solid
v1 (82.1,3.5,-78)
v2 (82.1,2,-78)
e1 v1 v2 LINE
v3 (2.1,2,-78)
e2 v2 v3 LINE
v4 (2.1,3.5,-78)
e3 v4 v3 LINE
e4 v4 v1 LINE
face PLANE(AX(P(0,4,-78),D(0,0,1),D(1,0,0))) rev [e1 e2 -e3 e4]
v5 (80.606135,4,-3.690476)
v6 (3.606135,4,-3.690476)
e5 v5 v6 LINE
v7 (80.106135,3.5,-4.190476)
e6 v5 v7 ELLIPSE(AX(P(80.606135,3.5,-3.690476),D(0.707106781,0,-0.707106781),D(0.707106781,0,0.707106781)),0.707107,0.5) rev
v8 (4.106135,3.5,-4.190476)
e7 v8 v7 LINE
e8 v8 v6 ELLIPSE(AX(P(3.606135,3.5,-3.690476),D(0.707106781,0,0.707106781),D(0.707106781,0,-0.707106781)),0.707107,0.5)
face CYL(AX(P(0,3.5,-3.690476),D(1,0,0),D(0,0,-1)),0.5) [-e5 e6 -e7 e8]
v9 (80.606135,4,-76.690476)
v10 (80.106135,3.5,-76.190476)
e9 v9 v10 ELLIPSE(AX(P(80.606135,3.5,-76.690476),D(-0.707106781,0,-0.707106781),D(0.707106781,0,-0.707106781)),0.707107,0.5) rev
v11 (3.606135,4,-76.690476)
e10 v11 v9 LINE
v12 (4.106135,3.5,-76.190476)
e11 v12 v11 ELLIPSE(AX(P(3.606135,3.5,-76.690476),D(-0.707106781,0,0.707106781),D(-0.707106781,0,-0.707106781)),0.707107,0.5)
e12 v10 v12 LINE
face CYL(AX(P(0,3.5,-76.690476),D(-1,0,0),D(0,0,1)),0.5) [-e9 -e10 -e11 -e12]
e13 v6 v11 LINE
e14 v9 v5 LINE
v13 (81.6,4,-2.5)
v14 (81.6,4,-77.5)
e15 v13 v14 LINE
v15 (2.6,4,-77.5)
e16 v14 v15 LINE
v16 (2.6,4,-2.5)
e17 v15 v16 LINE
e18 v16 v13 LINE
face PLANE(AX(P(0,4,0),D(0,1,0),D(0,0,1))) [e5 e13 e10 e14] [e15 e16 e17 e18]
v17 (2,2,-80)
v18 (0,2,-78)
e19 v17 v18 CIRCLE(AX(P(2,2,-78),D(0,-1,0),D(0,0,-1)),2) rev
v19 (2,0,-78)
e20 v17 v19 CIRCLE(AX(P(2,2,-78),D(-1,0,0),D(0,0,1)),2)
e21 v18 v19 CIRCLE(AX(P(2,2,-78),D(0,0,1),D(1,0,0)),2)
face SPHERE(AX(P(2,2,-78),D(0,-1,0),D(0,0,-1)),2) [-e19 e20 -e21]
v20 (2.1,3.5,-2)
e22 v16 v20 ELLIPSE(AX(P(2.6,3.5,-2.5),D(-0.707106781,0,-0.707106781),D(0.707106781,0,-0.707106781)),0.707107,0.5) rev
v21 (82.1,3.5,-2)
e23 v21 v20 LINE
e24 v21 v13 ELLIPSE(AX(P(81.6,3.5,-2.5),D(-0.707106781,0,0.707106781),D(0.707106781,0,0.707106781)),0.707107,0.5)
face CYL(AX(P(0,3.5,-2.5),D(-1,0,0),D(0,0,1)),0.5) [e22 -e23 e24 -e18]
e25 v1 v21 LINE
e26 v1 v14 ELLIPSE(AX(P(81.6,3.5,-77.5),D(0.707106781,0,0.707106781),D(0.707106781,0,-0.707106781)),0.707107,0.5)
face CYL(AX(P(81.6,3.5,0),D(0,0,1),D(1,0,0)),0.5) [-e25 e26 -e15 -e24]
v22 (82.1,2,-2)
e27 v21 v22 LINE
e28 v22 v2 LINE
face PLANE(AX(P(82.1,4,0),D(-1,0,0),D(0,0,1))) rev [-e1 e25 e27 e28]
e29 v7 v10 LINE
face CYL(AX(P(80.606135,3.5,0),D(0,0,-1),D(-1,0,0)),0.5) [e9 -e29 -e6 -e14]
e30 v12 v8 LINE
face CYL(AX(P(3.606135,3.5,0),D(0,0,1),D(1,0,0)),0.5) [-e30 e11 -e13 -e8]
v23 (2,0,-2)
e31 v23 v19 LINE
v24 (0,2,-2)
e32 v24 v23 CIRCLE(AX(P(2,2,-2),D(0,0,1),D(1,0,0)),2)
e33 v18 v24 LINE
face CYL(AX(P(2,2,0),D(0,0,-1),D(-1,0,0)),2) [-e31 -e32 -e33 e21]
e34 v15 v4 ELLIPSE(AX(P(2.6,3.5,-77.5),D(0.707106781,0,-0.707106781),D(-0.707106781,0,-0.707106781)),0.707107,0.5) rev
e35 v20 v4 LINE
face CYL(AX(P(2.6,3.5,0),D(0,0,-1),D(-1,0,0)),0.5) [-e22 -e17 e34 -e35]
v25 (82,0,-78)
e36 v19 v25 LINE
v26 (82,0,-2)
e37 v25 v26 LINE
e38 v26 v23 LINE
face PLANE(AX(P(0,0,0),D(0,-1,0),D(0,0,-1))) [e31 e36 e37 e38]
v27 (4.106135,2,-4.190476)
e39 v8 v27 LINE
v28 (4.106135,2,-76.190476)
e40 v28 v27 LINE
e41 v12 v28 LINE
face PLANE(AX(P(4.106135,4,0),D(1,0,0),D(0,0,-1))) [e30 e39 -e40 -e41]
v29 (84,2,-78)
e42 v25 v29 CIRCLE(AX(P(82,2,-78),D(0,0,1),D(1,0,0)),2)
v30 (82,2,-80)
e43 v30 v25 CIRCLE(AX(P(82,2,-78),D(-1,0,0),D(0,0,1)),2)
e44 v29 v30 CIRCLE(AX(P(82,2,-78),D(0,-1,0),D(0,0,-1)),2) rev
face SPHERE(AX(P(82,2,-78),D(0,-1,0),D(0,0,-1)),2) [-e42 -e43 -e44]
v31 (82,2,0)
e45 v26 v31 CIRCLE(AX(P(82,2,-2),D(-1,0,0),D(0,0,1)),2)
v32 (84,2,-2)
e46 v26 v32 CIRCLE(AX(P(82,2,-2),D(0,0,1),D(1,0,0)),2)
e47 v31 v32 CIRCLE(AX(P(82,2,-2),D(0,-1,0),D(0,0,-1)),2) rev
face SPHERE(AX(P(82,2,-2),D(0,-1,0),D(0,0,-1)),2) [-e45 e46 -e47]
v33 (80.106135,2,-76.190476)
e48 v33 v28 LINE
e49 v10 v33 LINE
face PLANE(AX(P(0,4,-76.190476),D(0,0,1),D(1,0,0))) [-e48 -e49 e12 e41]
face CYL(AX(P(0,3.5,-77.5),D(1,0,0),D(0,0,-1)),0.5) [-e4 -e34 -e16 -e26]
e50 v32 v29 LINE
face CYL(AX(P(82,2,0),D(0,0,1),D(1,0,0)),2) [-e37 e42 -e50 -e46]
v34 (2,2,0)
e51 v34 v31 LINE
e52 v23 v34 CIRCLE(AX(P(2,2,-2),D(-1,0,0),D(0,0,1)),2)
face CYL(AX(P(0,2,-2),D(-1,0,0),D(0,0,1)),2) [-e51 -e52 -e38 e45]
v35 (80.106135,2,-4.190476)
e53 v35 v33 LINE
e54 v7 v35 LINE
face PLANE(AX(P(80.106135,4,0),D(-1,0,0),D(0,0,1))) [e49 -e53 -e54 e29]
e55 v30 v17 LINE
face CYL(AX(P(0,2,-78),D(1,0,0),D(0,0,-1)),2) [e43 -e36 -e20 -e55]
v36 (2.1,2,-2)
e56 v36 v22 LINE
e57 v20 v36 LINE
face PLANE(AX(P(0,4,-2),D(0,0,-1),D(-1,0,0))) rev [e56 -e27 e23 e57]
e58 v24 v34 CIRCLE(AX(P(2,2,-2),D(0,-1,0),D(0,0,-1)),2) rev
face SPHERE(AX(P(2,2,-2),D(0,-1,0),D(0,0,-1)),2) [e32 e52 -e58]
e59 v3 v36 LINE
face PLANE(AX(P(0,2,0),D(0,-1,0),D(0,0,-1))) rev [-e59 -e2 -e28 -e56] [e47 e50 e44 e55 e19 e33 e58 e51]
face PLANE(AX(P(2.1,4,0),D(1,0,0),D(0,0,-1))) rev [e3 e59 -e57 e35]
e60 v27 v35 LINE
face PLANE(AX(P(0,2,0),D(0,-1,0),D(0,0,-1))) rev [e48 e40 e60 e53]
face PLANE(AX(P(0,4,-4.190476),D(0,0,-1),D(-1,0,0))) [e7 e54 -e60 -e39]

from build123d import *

# Parameters (mm, degrees)
SKETCH1_W           = 84
SKETCH1_H           = 80
BOSS_EXTRUDE1_DEPTH = 2
SKETCH3_W           = 80
SKETCH3_H           = 76
SKETCH3_W_2         = 76
SKETCH3_H_2         = 72
BOSS_EXTRUDE2_DEPTH = 2
FILLET1_R           = 2
FILLET2_R           = 2
FILLET3_R           = 0.5


with BuildPart() as part:
    # Sketch1 → Boss-Extrude1 (new body)
    with BuildSketch(Plane(origin=(0, 0, 0), x_dir=(1, 0, 0), z_dir=(0, 1, 0))):
        with Locations((42, 40)):
            Rectangle(SKETCH1_W, SKETCH1_H)
    extrude(amount=BOSS_EXTRUDE1_DEPTH)

    # Sketch3 → Boss-Extrude2 (add)
    with BuildSketch(Plane(origin=(0, 2, 0), x_dir=(1, 0, 0), z_dir=(0, 1, 0))):
        with Locations((42.1, 40)):
            Rectangle(SKETCH3_W, SKETCH3_H)
        with Locations((42.106134664, 40.19047619)):
            Rectangle(SKETCH3_W_2, SKETCH3_H_2, mode=Mode.SUBTRACT)
    extrude(amount=BOSS_EXTRUDE2_DEPTH)

    # Fillet1
    fillet1_edges = [part.edges().sort_by_distance(p)[0] for p in [
        (0, 1, -80),
        (84, 1, -80),
        (84, 1, 0),
        (0, 1, 0),
    ]]
    fillet(fillet1_edges, radius=FILLET1_R)

    # Fillet2
    fillet2_edges = [part.edges().sort_by_distance(p)[0] for p in [
        (0.585786438, 0, -0.585786438),
        (0.585786438, 0, -79.414213562),
        (83.414213562, 0, -79.414213562),
        (83.414213562, 0, -0.585786438),
        (84, 0, -40),
        (42, 0, -80),
        (0, 0, -40),
        (42, 0, 0),
    ]]
    fillet(fillet2_edges, radius=FILLET2_R - 0.0001)  # a hair under: the kernel refuses the full size

    # Fillet3
    fillet3_edges = [part.edges().sort_by_distance(p)[0] for p in [
        (42.1, 4, -2),
        (82.1, 4, -40),
        (42.1, 4, -78),
        (2.1, 4, -40),
        (42.106134664, 4, -4.19047619),
        (80.106134664, 4, -40.19047619),
        (42.106134664, 4, -76.19047619),
        (4.106134664, 4, -40.19047619),
    ]]
    fillet(fillet3_edges, radius=FILLET3_R)


solid = part.part
